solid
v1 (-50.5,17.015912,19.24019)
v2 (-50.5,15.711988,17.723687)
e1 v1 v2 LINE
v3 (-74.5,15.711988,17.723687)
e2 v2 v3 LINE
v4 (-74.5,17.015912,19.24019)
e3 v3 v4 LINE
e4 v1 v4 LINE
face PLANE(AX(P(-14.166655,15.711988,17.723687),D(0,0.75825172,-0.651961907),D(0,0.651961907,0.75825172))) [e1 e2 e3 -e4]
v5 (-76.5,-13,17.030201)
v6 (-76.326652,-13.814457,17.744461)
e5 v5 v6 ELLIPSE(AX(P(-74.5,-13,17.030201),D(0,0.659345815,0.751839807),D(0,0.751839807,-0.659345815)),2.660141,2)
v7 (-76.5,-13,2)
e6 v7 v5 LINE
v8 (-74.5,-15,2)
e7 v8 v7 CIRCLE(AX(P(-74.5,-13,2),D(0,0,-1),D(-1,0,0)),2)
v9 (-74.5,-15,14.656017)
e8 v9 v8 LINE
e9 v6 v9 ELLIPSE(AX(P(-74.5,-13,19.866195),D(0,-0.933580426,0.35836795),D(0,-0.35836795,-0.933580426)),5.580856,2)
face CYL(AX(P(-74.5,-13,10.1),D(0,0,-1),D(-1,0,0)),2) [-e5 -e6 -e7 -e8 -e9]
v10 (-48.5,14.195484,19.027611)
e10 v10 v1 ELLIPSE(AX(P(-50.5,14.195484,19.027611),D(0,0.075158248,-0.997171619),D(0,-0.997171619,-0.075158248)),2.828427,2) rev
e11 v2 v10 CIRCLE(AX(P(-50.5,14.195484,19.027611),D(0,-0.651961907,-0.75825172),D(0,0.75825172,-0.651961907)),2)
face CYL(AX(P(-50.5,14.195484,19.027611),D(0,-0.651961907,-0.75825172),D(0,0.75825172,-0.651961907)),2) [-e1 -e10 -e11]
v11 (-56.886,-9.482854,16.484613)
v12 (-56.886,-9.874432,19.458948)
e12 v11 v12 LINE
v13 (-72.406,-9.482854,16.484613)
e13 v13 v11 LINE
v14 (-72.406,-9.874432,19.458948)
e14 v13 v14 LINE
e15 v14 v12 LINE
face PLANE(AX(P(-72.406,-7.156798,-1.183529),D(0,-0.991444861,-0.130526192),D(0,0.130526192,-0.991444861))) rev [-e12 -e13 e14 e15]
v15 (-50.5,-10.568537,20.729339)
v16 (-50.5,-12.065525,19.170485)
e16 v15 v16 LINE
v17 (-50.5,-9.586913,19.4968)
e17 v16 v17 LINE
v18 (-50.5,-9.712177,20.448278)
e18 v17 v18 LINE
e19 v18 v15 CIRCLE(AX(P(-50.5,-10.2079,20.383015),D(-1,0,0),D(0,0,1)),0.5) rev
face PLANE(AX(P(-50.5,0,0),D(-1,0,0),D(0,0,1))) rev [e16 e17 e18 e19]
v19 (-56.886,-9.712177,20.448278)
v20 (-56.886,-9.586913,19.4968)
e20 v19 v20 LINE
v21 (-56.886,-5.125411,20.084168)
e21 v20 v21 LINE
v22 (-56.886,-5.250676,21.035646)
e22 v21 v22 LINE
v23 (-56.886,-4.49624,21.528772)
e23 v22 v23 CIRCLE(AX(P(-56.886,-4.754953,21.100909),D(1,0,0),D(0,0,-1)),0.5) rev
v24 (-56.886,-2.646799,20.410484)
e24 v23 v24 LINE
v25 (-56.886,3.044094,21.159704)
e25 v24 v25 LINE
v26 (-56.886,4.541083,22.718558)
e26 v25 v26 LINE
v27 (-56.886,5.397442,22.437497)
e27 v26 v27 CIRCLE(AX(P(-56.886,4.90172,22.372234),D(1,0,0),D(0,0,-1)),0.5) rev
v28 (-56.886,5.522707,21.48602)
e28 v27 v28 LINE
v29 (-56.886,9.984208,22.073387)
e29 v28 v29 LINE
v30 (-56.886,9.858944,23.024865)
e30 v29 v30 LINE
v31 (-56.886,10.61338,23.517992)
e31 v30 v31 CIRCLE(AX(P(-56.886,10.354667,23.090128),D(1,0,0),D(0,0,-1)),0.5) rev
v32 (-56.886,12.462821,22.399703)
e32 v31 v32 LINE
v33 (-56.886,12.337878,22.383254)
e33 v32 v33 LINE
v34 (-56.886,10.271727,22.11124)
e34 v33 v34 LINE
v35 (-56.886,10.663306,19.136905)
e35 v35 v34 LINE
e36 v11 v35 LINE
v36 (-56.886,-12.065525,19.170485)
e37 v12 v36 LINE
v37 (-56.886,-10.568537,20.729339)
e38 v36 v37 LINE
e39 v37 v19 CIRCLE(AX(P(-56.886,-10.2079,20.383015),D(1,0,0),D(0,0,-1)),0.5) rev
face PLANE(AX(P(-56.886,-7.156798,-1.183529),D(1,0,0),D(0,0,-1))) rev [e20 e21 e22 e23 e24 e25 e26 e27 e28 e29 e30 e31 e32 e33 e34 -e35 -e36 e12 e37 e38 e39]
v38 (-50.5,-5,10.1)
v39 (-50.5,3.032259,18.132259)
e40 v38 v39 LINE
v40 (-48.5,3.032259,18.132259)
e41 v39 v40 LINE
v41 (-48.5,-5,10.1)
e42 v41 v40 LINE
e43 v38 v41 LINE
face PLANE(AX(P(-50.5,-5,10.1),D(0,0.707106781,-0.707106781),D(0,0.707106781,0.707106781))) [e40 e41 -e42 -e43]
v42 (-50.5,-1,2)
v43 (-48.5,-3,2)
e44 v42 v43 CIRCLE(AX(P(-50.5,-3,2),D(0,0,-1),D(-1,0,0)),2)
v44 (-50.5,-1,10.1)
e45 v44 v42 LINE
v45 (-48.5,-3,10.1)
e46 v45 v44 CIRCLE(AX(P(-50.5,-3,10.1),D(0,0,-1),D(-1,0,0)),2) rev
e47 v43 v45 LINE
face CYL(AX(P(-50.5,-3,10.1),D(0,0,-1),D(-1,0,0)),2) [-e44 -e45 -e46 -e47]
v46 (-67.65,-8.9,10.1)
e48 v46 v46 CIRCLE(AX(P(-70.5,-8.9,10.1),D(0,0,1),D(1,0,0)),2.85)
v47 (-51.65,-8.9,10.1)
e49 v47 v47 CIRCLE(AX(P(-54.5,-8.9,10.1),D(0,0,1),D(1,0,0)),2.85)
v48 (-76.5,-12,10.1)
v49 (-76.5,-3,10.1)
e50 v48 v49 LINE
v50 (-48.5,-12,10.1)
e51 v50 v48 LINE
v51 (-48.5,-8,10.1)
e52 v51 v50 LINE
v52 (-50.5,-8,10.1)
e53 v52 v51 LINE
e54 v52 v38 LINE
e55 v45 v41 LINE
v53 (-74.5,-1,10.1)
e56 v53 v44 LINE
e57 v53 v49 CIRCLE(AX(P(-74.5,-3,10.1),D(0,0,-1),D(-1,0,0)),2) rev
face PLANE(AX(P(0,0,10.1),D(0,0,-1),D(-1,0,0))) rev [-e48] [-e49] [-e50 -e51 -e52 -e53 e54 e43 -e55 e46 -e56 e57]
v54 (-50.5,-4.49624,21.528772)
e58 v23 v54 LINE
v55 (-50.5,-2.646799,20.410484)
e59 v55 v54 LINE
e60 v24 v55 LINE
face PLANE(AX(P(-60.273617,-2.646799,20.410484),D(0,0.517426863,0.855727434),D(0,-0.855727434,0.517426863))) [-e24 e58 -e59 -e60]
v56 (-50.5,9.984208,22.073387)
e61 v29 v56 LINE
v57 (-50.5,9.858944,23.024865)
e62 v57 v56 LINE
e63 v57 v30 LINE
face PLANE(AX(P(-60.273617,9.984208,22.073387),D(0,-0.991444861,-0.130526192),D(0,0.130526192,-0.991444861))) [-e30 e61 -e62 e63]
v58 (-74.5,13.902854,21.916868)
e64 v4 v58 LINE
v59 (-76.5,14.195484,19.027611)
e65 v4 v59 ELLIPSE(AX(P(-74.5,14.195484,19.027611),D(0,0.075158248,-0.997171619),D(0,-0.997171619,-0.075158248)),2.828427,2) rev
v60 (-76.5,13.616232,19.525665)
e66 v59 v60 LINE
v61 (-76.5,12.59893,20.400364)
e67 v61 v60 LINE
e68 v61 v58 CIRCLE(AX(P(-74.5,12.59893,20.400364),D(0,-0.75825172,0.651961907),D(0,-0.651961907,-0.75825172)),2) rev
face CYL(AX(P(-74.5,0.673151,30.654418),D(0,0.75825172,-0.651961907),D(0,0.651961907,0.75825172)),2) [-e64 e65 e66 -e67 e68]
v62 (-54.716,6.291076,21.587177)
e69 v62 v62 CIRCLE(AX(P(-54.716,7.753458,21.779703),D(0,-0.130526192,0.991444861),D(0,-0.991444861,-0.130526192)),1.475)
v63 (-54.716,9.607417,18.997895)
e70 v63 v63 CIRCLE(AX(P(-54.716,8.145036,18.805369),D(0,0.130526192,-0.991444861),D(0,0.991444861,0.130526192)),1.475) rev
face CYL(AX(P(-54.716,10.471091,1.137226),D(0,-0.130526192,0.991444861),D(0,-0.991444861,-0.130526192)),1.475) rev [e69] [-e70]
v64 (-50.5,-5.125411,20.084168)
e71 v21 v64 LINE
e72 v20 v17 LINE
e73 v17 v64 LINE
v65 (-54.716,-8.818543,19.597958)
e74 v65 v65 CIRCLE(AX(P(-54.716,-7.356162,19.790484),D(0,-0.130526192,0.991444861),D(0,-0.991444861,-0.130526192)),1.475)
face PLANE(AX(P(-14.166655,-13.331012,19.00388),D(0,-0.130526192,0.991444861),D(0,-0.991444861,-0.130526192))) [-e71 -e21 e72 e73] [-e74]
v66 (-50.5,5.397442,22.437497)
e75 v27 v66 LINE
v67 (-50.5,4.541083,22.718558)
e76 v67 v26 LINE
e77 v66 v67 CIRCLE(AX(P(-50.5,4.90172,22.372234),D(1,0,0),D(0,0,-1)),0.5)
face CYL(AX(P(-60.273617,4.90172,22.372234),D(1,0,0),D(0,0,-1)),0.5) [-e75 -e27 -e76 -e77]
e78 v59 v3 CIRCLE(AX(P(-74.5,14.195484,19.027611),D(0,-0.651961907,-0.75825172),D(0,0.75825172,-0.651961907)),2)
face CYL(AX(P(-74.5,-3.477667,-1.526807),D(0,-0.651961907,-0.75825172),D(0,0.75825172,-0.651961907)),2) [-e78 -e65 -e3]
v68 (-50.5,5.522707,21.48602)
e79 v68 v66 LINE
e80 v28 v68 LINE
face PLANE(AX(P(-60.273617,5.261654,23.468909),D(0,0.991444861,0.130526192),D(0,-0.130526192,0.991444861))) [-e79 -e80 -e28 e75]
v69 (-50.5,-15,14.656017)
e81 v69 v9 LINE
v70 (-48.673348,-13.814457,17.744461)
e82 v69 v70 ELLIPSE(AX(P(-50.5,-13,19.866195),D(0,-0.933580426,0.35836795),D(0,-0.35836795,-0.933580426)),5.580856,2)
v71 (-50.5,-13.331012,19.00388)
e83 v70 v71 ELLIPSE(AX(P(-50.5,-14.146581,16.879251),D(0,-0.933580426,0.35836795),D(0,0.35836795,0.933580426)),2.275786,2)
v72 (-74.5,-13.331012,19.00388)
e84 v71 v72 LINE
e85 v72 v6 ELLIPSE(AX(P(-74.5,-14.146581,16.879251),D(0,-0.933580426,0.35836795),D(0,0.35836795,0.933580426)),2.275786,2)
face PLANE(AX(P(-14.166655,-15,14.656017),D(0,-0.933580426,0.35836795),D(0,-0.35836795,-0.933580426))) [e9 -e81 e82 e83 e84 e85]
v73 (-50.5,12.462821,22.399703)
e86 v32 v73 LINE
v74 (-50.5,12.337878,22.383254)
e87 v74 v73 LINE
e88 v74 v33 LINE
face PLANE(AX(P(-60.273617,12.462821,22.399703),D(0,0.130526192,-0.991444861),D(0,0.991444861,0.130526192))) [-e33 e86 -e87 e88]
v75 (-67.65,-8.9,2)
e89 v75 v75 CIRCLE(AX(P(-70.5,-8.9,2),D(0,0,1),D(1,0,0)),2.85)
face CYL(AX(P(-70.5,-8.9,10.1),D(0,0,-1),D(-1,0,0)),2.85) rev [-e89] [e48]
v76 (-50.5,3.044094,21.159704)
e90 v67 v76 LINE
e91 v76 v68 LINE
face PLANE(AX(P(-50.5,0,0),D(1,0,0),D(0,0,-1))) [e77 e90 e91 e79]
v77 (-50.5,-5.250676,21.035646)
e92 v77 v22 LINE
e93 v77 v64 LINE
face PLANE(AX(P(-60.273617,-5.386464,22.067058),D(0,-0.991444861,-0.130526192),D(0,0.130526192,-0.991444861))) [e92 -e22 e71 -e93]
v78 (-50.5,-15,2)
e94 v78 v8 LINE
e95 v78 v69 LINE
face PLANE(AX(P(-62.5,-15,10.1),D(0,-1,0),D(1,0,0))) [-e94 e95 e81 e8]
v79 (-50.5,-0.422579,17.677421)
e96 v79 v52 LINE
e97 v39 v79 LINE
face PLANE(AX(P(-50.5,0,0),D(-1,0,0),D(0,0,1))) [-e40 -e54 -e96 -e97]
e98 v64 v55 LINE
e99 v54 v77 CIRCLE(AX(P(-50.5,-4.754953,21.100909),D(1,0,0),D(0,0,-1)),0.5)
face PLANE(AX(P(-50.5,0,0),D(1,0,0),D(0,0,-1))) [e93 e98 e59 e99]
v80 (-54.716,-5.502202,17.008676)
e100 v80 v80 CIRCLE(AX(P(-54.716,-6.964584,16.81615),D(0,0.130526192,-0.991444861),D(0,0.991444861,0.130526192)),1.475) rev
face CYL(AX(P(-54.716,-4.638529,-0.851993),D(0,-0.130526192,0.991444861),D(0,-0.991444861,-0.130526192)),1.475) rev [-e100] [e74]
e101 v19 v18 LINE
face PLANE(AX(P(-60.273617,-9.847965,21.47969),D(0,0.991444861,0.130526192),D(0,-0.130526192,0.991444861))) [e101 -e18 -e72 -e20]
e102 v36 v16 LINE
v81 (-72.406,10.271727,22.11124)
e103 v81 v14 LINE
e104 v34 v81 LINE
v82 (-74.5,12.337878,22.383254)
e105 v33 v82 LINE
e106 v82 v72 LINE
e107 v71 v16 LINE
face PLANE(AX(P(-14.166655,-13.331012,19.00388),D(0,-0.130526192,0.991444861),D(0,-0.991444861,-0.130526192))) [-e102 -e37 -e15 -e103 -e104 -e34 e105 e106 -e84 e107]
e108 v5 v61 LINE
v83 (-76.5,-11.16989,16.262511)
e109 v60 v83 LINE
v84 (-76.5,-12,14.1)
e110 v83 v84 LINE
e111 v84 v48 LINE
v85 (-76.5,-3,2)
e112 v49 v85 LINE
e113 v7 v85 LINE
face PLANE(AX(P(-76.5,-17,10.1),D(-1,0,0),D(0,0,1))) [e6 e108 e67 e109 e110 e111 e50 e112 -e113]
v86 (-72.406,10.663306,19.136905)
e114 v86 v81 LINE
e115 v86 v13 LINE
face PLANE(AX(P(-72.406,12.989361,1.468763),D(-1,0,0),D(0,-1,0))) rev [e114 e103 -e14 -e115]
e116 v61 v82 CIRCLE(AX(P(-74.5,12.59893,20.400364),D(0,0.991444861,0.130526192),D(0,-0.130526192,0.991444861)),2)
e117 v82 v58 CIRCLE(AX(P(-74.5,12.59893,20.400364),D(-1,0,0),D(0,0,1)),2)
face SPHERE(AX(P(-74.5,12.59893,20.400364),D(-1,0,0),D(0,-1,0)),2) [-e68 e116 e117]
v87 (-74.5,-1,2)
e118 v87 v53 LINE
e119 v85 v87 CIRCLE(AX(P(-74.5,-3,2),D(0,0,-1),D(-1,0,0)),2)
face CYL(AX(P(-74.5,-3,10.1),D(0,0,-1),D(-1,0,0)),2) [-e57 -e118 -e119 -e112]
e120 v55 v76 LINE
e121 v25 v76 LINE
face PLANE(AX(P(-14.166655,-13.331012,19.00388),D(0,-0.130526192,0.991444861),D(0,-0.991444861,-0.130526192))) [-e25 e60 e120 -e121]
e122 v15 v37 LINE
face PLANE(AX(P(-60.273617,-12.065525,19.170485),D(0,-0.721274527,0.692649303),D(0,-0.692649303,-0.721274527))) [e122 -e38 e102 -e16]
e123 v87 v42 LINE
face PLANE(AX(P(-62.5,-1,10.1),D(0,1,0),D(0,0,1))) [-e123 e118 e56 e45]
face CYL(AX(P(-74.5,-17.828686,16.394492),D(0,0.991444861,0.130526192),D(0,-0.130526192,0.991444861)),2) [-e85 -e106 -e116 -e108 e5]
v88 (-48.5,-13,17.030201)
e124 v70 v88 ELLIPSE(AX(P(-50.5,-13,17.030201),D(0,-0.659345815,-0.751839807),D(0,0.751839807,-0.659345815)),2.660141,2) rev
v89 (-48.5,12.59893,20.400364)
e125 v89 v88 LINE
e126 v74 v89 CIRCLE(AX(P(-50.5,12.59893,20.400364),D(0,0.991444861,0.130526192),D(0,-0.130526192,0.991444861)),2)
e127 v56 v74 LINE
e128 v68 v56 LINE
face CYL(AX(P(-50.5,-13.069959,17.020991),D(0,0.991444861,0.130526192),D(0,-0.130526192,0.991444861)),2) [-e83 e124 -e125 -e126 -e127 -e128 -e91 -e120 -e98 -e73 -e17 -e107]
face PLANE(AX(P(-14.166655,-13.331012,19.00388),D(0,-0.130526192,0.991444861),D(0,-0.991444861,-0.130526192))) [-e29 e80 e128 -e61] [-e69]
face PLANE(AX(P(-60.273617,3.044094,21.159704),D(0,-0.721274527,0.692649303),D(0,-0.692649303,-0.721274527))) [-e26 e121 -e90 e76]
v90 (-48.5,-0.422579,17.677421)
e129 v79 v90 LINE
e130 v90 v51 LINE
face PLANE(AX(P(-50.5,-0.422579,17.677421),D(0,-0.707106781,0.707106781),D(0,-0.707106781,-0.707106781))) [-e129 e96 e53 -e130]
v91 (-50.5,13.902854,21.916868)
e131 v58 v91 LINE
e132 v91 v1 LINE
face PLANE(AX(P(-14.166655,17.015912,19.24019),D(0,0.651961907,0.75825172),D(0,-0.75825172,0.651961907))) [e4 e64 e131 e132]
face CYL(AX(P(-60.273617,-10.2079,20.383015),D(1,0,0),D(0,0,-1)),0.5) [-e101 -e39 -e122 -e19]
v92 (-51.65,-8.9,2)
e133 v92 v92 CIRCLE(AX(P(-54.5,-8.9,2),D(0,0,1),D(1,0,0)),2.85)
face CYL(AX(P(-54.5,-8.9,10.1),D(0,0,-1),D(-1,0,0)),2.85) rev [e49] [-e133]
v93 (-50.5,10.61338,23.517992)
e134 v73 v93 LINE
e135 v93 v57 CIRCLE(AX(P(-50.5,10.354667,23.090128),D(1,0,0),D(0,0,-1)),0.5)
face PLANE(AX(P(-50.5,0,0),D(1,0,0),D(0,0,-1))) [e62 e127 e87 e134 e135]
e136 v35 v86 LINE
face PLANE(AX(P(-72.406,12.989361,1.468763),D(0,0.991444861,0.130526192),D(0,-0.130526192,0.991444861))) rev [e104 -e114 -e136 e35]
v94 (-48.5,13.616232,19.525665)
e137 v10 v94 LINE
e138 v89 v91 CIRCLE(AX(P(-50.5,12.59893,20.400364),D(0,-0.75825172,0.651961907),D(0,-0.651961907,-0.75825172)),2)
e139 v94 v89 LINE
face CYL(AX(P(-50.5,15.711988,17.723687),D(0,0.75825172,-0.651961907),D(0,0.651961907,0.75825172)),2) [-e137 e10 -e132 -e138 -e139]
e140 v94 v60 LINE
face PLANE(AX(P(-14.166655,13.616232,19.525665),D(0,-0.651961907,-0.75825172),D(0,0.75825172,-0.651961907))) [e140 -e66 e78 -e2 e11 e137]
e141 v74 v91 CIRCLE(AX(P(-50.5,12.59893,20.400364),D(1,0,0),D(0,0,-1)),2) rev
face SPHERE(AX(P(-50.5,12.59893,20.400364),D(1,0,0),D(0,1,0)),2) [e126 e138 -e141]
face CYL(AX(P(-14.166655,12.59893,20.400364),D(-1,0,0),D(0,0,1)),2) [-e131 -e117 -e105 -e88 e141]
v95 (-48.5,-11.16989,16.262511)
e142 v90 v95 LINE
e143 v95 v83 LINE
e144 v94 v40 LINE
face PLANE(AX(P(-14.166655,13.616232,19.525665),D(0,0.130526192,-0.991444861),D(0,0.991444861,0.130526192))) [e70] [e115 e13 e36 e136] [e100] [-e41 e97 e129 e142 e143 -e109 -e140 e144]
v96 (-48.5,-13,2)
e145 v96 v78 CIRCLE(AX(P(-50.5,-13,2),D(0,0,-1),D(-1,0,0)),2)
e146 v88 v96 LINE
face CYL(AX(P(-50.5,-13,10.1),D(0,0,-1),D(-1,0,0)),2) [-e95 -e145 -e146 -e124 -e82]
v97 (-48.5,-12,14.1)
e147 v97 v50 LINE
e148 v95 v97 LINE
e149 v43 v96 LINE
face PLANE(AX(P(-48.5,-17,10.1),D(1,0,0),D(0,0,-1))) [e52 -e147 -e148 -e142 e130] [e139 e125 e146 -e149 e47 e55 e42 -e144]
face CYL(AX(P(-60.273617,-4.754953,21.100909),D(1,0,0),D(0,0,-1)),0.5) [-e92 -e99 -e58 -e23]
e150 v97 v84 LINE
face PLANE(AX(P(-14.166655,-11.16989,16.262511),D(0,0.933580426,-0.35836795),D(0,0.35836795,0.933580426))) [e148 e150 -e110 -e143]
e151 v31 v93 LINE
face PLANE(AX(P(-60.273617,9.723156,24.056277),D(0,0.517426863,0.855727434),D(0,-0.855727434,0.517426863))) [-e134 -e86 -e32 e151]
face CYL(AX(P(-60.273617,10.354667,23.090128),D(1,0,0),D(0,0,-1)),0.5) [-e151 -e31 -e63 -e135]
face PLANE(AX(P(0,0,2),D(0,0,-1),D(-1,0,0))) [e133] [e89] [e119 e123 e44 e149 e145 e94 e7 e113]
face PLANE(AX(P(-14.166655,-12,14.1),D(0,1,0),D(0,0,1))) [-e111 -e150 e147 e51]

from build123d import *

# Parameters (mm, degrees)
BOSS_EXTRUDE1_START = 2
SKETCH2_W           = 28
SKETCH2_H           = 14
SKETCH2_R           = 2.85
BOSS_EXTRUDE1_DEPTH = 8.1
BOSS_EXTRUDE5_DEPTH = 28
CUT_EXTRUDE1_REACH  = 83.112
SKETCH7_R           = 1.475
SKETCH7_W           = 15.52
SKETCH7_H           = 20.32
BOSS_EXTRUDE7_DEPTH = 2
FILLET1_R           = 2
BOSS_EXTRUDE8_START = -2
BOSS_EXTRUDE8_DEPTH = 6.386
FILLET2_R           = 0.5


with BuildPart() as part:
    # Sketch2 → Boss-Extrude1 (new body)
    with BuildSketch(Plane.XY.offset(BOSS_EXTRUDE1_START)):
        with Locations((-62.5, -8)):
            Rectangle(SKETCH2_W, SKETCH2_H)
        with Locations((-54.5, -8.9)):
            Circle(SKETCH2_R, mode=Mode.SUBTRACT)
        with Locations((-70.5, -8.9)):
            Circle(SKETCH2_R, mode=Mode.SUBTRACT)
    extrude(amount=BOSS_EXTRUDE1_DEPTH)

    # Sketch6 → Boss-Extrude5 (add)
    with BuildSketch(Plane.ZY.offset(76.5)):
        Polygon((10.1, -15), (14.656017135, -15), (19.003880422, -13.331011655), (22.5, 13.224653006), (19.240190464, 17.015911609), (17.723687023, 15.711987794), (19.525665416, 13.616231583), (16.26251061, -11.169889951), (14.1, -12), (10.1, -12), align=None)
    extrude(amount=-BOSS_EXTRUDE5_DEPTH)

    # Sketch7 → Cut-Extrude1 (cut, up to next)
    with BuildSketch(Plane(origin=(0, -2.686404695, 20.405269514), x_dir=(1, 0, 0), z_dir=(0, -0.13052619222004436, 0.9914448613738114)), mode=Mode.PRIVATE) as cut_extrude1_sk1:
        with Locations(Location((-54.716, -4.710052631, 0), (0, 0, 270))):
            Circle(SKETCH7_R)
    cut_extrude1_tool1 = extrude(cut_extrude1_sk1.sketch, amount=-CUT_EXTRUDE1_REACH, mode=Mode.PRIVATE) & part.part
    # Sketch7 → Cut-Extrude1 (cut, up to next)
    with BuildSketch(Plane(origin=(0, -2.686404695, 20.405269514), x_dir=(1, 0, 0), z_dir=(0, -0.13052619222004436, 0.9914448613738114)), mode=Mode.PRIVATE) as cut_extrude1_sk2:
        with Locations(Location((-54.716, 10.529947369, 0), (0, 0, 270))):
            Circle(SKETCH7_R)
    cut_extrude1_tool2 = extrude(cut_extrude1_sk2.sketch, amount=-CUT_EXTRUDE1_REACH, mode=Mode.PRIVATE) & part.part
    # Sketch7 → Cut-Extrude1 (cut, up to next)
    with BuildSketch(Plane(origin=(0, -2.686404695, 20.405269514), x_dir=(1, 0, 0), z_dir=(0, -0.13052619222004436, 0.9914448613738114)), mode=Mode.PRIVATE) as cut_extrude1_sk3:
        with Locations((-64.646, 2.909947369)):
            Rectangle(SKETCH7_W, SKETCH7_H)
    cut_extrude1_tool3 = extrude(cut_extrude1_sk3.sketch, amount=-CUT_EXTRUDE1_REACH, mode=Mode.PRIVATE) & part.part
    add(cut_extrude1_tool1.solids().sort_by_distance((-54.716, -7.356162, 19.790484))[0], mode=Mode.SUBTRACT)
    add(cut_extrude1_tool2.solids().sort_by_distance((-54.716, 7.753458, 21.779703))[0], mode=Mode.SUBTRACT)
    add(cut_extrude1_tool3.solids().sort_by_distance((-64.646, 0.198648, 20.785094))[0], mode=Mode.SUBTRACT)

    # Sketch10 → Boss-Extrude7 (add)
    with BuildSketch(Plane(origin=(-48.5, 0, 0), x_dir=(0, 0, -1), z_dir=(1, 0, 0))):
        Polygon((-18.13225899, 3.03225899), (-17.67742093, -0.42257907), (-10.1, -8), (-10.1, -5), align=None)
    extrude(amount=-BOSS_EXTRUDE7_DEPTH)

    # Fillet1
    # the kernel refuses this fillet: 2 mm, written as the material it takes off along each edge
    with BuildSketch(Plane(origin=(-50.5, 12.598930148, 20.400364102), x_dir=(0, 0.6519619071782031, 0.758251720465282), z_dir=(1, 0, 0))) as fillet1_piece_1_section:
        Polygon((0, 0), (FILLET1_R * 1.02, 0), (FILLET1_R * 1.02, FILLET1_R * 0.45615786741), (FILLET1_R * 0.68, FILLET1_R * 0.76026311235), align=None)
    fillet1_piece_1 = extrude(amount=FILLET1_R * 1.02, mode=Mode.PRIVATE)
    fillet1_piece_1 = fillet1_piece_1 - Plane(origin=(-50.5, 12.598930148, 20.400364102), x_dir=(0, -0.28560210337141756, -0.9583482866629555), z_dir=(1, 0, 0)) * Sphere(FILLET1_R, mode=Mode.PRIVATE)
    add(fillet1_piece_1, mode=Mode.SUBTRACT)
    with BuildSketch(Plane(origin=(-74.5, 12.598930148, 20.400364102), x_dir=(0, 0.6519619071782031, 0.758251720465282), z_dir=(-1, 0, 0))) as fillet1_piece_2_section:
        Polygon((0, 0), (FILLET1_R * 1.02, 0), (FILLET1_R * 1.02, -FILLET1_R * 0.45615786741), (FILLET1_R * 0.68, -FILLET1_R * 0.76026311235), align=None)
    fillet1_piece_2 = extrude(amount=FILLET1_R * 1.02, mode=Mode.PRIVATE)
    fillet1_piece_2 = fillet1_piece_2 - Plane(origin=(-74.5, 12.598930148, 20.400364102), x_dir=(0, -0.28560210337141756, -0.9583482866629555), z_dir=(-1, 0, 0)) * Sphere(FILLET1_R, mode=Mode.PRIVATE)
    add(fillet1_piece_2, mode=Mode.SUBTRACT)
    with BuildSketch(Plane(origin=(-76.5, -15, 19.656017135), x_dir=(1, 0, 0), z_dir=(0, 0, -1)), Plane(origin=(-48.5, -15, -3), x_dir=(-1, 0, 0), z_dir=(0, 0, 1))) as fillet1_piece_3:
        with BuildLine():
            CenterArc((FILLET1_R, -FILLET1_R), FILLET1_R, 90, 90)
            Line((0, -FILLET1_R), (0, 0))
            Line((0, 0), (FILLET1_R, 0))
        make_face()
    extrude(amount=22.656017135, mode=Mode.SUBTRACT)
    with BuildSketch(Plane(origin=(-76.5, -1, -3), x_dir=(0, -1, 0), z_dir=(0, 0, 1))) as fillet1_piece_4:
        with BuildLine():
            CenterArc((FILLET1_R, FILLET1_R), FILLET1_R, 180, 90)
            Line((0, FILLET1_R), (0, 0))
            Line((0, 0), (FILLET1_R, 0))
        make_face()
    extrude(amount=18.1, mode=Mode.SUBTRACT)
    with BuildSketch(Plane(origin=(-48.5, -1, -3), x_dir=(0, -1, 0), z_dir=(0, 0, 1))) as fillet1_piece_5_section:
        with BuildLine():
            CenterArc((FILLET1_R, -FILLET1_R), FILLET1_R, 90, 90)
            Line((0, -FILLET1_R), (0, 0))
            Line((0, 0), (FILLET1_R, 0))
        make_face()
    fillet1_piece_5 = extrude(amount=18.1, mode=Mode.PRIVATE)
    fillet1_piece_5 = split(fillet1_piece_5, bisect_by=Plane(origin=(-48.946735878, -5.248367939, 9.851632061), z_dir=(0, 0.707106781186545, -0.7071067811865501)), keep=Keep.TOP, mode=Mode.PRIVATE)
    add(fillet1_piece_5, mode=Mode.SUBTRACT)
    with BuildSketch(Plane(origin=(-48.5, 13.902853963, 21.916867543), x_dir=(0, -0.6519619071782031, -0.758251720465282), z_dir=(0, 0.758251720465282, -0.6519619071782031))) as fillet1_piece_6:
        with BuildLine():
            CenterArc((FILLET1_R, FILLET1_R), FILLET1_R, 180, 90)
            Line((0, FILLET1_R), (0, 0))
            Line((0, 0), (FILLET1_R, 0))
        make_face()
    extrude(amount=9.105572809, mode=Mode.SUBTRACT)
    with BuildSketch(Plane(origin=(-76.5, 13.902853963, 21.916867543), x_dir=(0, -0.6519619071782031, -0.758251720465282), z_dir=(0, 0.758251720465282, -0.6519619071782031))) as fillet1_piece_7:
        with BuildLine():
            CenterArc((FILLET1_R, -FILLET1_R), FILLET1_R, 90, 90)
            Line((0, -FILLET1_R), (0, 0))
            Line((0, 0), (FILLET1_R, 0))
        make_face()
    extrude(amount=9.105572809, mode=Mode.SUBTRACT)
    with BuildSketch(Plane(origin=(-48.5, -18.288235962, 18.351249461), x_dir=(0, 0.1305261922200442, -0.9914448613738114), z_dir=(0, 0.9914448613738114, 0.13052619222004422))) as fillet1_piece_8:
        with BuildLine():
            CenterArc((FILLET1_R, FILLET1_R), FILLET1_R, 180, 90)
            Line((0, FILLET1_R), (0, 0))
            Line((0, 0), (FILLET1_R, 0))
        make_face()
    extrude(amount=30.890385254, mode=Mode.SUBTRACT)
    with BuildSketch(Plane(origin=(-76.5, -18.288235962, 18.351249461), x_dir=(0, 0.1305261922200442, -0.9914448613738114), z_dir=(0, 0.9914448613738114, 0.13052619222004422))) as fillet1_piece_9:
        with BuildLine():
            CenterArc((FILLET1_R, -FILLET1_R), FILLET1_R, 90, 90)
            Line((0, -FILLET1_R), (0, 0))
            Line((0, 0), (FILLET1_R, 0))
        make_face()
    extrude(amount=30.890385254, mode=Mode.SUBTRACT)
    with BuildSketch(Plane(origin=(-74.5, 13.224653006, 22.5), x_dir=(0, 0.7582517204652818, -0.6519619071782033), z_dir=(1, 0, 0))) as fillet1_piece_10:
        with BuildLine():
            CenterArc((FILLET1_R * 0.4472135955, -FILLET1_R), FILLET1_R, 90, 48.189685104)
            Line((-FILLET1_R * 0.298142397, -FILLET1_R * 0.333333333333), (0, 0))
            Line((0, 0), (FILLET1_R * 0.4472135955, 0))
        make_face()
    extrude(amount=24, mode=Mode.SUBTRACT)
    with BuildSketch(Plane(origin=(-48.5, 20.275721145, 23.031449066), x_dir=(0, -0.7582517204652808, 0.6519619071782047), z_dir=(0, -0.6519619071782047, -0.7582517204652808))) as fillet1_piece_11:
        with BuildLine():
            CenterArc((FILLET1_R, FILLET1_R), FILLET1_R, 180, 90)
            Line((0, FILLET1_R), (0, 0))
            Line((0, 0), (FILLET1_R, 0))
        make_face()
    extrude(amount=12, mode=Mode.SUBTRACT)
    with BuildSketch(Plane(origin=(-76.5, 20.275721145, 23.031449066), x_dir=(0, -0.7582517204652808, 0.6519619071782046), z_dir=(0, -0.6519619071782047, -0.7582517204652808))) as fillet1_piece_12:
        with BuildLine():
            CenterArc((FILLET1_R, -FILLET1_R), FILLET1_R, 90, 90)
            Line((0, -FILLET1_R), (0, 0))
            Line((0, 0), (FILLET1_R, 0))
        make_face()
    extrude(amount=12, mode=Mode.SUBTRACT)

    # Sketch11 → Boss-Extrude8 (add)
    with BuildSketch(Plane(origin=(-48.5, 0, 0), x_dir=(0, 0, -1), z_dir=(1, 0, 0)).offset(BOSS_EXTRUDE8_START)):
        Polygon((-21.159704036, 3.044094423), (-23.468909239, 5.261654192), (-21.486019516, 5.522706576), align=None)
        Polygon((-22.399702862, 12.462820606), (-22.073387381, 9.984208452), (-24.056277104, 9.723156068), align=None)
        Polygon((-21.479690069, -9.847965496), (-19.496800347, -9.586913111), (-19.170484866, -12.065525265), align=None)
        Polygon((-22.067057934, -5.386463619), (-20.084168212, -5.125411235), (-20.410483692, -2.646799082), align=None)
    extrude(amount=-BOSS_EXTRUDE8_DEPTH)

    # Fillet2
    fillet2_edges = [part.edges().sort_by_distance(p)[0] for p in [
        (-53.693, 5.261654192, 23.468909239),
        (-53.693, 9.723156068, 24.056277104),
        (-53.693, -5.386463619, 22.067057934),
        (-53.693, -9.847965496, 21.479690069),
    ]]
    fillet(fillet2_edges, radius=FILLET2_R)


solid = part.part
